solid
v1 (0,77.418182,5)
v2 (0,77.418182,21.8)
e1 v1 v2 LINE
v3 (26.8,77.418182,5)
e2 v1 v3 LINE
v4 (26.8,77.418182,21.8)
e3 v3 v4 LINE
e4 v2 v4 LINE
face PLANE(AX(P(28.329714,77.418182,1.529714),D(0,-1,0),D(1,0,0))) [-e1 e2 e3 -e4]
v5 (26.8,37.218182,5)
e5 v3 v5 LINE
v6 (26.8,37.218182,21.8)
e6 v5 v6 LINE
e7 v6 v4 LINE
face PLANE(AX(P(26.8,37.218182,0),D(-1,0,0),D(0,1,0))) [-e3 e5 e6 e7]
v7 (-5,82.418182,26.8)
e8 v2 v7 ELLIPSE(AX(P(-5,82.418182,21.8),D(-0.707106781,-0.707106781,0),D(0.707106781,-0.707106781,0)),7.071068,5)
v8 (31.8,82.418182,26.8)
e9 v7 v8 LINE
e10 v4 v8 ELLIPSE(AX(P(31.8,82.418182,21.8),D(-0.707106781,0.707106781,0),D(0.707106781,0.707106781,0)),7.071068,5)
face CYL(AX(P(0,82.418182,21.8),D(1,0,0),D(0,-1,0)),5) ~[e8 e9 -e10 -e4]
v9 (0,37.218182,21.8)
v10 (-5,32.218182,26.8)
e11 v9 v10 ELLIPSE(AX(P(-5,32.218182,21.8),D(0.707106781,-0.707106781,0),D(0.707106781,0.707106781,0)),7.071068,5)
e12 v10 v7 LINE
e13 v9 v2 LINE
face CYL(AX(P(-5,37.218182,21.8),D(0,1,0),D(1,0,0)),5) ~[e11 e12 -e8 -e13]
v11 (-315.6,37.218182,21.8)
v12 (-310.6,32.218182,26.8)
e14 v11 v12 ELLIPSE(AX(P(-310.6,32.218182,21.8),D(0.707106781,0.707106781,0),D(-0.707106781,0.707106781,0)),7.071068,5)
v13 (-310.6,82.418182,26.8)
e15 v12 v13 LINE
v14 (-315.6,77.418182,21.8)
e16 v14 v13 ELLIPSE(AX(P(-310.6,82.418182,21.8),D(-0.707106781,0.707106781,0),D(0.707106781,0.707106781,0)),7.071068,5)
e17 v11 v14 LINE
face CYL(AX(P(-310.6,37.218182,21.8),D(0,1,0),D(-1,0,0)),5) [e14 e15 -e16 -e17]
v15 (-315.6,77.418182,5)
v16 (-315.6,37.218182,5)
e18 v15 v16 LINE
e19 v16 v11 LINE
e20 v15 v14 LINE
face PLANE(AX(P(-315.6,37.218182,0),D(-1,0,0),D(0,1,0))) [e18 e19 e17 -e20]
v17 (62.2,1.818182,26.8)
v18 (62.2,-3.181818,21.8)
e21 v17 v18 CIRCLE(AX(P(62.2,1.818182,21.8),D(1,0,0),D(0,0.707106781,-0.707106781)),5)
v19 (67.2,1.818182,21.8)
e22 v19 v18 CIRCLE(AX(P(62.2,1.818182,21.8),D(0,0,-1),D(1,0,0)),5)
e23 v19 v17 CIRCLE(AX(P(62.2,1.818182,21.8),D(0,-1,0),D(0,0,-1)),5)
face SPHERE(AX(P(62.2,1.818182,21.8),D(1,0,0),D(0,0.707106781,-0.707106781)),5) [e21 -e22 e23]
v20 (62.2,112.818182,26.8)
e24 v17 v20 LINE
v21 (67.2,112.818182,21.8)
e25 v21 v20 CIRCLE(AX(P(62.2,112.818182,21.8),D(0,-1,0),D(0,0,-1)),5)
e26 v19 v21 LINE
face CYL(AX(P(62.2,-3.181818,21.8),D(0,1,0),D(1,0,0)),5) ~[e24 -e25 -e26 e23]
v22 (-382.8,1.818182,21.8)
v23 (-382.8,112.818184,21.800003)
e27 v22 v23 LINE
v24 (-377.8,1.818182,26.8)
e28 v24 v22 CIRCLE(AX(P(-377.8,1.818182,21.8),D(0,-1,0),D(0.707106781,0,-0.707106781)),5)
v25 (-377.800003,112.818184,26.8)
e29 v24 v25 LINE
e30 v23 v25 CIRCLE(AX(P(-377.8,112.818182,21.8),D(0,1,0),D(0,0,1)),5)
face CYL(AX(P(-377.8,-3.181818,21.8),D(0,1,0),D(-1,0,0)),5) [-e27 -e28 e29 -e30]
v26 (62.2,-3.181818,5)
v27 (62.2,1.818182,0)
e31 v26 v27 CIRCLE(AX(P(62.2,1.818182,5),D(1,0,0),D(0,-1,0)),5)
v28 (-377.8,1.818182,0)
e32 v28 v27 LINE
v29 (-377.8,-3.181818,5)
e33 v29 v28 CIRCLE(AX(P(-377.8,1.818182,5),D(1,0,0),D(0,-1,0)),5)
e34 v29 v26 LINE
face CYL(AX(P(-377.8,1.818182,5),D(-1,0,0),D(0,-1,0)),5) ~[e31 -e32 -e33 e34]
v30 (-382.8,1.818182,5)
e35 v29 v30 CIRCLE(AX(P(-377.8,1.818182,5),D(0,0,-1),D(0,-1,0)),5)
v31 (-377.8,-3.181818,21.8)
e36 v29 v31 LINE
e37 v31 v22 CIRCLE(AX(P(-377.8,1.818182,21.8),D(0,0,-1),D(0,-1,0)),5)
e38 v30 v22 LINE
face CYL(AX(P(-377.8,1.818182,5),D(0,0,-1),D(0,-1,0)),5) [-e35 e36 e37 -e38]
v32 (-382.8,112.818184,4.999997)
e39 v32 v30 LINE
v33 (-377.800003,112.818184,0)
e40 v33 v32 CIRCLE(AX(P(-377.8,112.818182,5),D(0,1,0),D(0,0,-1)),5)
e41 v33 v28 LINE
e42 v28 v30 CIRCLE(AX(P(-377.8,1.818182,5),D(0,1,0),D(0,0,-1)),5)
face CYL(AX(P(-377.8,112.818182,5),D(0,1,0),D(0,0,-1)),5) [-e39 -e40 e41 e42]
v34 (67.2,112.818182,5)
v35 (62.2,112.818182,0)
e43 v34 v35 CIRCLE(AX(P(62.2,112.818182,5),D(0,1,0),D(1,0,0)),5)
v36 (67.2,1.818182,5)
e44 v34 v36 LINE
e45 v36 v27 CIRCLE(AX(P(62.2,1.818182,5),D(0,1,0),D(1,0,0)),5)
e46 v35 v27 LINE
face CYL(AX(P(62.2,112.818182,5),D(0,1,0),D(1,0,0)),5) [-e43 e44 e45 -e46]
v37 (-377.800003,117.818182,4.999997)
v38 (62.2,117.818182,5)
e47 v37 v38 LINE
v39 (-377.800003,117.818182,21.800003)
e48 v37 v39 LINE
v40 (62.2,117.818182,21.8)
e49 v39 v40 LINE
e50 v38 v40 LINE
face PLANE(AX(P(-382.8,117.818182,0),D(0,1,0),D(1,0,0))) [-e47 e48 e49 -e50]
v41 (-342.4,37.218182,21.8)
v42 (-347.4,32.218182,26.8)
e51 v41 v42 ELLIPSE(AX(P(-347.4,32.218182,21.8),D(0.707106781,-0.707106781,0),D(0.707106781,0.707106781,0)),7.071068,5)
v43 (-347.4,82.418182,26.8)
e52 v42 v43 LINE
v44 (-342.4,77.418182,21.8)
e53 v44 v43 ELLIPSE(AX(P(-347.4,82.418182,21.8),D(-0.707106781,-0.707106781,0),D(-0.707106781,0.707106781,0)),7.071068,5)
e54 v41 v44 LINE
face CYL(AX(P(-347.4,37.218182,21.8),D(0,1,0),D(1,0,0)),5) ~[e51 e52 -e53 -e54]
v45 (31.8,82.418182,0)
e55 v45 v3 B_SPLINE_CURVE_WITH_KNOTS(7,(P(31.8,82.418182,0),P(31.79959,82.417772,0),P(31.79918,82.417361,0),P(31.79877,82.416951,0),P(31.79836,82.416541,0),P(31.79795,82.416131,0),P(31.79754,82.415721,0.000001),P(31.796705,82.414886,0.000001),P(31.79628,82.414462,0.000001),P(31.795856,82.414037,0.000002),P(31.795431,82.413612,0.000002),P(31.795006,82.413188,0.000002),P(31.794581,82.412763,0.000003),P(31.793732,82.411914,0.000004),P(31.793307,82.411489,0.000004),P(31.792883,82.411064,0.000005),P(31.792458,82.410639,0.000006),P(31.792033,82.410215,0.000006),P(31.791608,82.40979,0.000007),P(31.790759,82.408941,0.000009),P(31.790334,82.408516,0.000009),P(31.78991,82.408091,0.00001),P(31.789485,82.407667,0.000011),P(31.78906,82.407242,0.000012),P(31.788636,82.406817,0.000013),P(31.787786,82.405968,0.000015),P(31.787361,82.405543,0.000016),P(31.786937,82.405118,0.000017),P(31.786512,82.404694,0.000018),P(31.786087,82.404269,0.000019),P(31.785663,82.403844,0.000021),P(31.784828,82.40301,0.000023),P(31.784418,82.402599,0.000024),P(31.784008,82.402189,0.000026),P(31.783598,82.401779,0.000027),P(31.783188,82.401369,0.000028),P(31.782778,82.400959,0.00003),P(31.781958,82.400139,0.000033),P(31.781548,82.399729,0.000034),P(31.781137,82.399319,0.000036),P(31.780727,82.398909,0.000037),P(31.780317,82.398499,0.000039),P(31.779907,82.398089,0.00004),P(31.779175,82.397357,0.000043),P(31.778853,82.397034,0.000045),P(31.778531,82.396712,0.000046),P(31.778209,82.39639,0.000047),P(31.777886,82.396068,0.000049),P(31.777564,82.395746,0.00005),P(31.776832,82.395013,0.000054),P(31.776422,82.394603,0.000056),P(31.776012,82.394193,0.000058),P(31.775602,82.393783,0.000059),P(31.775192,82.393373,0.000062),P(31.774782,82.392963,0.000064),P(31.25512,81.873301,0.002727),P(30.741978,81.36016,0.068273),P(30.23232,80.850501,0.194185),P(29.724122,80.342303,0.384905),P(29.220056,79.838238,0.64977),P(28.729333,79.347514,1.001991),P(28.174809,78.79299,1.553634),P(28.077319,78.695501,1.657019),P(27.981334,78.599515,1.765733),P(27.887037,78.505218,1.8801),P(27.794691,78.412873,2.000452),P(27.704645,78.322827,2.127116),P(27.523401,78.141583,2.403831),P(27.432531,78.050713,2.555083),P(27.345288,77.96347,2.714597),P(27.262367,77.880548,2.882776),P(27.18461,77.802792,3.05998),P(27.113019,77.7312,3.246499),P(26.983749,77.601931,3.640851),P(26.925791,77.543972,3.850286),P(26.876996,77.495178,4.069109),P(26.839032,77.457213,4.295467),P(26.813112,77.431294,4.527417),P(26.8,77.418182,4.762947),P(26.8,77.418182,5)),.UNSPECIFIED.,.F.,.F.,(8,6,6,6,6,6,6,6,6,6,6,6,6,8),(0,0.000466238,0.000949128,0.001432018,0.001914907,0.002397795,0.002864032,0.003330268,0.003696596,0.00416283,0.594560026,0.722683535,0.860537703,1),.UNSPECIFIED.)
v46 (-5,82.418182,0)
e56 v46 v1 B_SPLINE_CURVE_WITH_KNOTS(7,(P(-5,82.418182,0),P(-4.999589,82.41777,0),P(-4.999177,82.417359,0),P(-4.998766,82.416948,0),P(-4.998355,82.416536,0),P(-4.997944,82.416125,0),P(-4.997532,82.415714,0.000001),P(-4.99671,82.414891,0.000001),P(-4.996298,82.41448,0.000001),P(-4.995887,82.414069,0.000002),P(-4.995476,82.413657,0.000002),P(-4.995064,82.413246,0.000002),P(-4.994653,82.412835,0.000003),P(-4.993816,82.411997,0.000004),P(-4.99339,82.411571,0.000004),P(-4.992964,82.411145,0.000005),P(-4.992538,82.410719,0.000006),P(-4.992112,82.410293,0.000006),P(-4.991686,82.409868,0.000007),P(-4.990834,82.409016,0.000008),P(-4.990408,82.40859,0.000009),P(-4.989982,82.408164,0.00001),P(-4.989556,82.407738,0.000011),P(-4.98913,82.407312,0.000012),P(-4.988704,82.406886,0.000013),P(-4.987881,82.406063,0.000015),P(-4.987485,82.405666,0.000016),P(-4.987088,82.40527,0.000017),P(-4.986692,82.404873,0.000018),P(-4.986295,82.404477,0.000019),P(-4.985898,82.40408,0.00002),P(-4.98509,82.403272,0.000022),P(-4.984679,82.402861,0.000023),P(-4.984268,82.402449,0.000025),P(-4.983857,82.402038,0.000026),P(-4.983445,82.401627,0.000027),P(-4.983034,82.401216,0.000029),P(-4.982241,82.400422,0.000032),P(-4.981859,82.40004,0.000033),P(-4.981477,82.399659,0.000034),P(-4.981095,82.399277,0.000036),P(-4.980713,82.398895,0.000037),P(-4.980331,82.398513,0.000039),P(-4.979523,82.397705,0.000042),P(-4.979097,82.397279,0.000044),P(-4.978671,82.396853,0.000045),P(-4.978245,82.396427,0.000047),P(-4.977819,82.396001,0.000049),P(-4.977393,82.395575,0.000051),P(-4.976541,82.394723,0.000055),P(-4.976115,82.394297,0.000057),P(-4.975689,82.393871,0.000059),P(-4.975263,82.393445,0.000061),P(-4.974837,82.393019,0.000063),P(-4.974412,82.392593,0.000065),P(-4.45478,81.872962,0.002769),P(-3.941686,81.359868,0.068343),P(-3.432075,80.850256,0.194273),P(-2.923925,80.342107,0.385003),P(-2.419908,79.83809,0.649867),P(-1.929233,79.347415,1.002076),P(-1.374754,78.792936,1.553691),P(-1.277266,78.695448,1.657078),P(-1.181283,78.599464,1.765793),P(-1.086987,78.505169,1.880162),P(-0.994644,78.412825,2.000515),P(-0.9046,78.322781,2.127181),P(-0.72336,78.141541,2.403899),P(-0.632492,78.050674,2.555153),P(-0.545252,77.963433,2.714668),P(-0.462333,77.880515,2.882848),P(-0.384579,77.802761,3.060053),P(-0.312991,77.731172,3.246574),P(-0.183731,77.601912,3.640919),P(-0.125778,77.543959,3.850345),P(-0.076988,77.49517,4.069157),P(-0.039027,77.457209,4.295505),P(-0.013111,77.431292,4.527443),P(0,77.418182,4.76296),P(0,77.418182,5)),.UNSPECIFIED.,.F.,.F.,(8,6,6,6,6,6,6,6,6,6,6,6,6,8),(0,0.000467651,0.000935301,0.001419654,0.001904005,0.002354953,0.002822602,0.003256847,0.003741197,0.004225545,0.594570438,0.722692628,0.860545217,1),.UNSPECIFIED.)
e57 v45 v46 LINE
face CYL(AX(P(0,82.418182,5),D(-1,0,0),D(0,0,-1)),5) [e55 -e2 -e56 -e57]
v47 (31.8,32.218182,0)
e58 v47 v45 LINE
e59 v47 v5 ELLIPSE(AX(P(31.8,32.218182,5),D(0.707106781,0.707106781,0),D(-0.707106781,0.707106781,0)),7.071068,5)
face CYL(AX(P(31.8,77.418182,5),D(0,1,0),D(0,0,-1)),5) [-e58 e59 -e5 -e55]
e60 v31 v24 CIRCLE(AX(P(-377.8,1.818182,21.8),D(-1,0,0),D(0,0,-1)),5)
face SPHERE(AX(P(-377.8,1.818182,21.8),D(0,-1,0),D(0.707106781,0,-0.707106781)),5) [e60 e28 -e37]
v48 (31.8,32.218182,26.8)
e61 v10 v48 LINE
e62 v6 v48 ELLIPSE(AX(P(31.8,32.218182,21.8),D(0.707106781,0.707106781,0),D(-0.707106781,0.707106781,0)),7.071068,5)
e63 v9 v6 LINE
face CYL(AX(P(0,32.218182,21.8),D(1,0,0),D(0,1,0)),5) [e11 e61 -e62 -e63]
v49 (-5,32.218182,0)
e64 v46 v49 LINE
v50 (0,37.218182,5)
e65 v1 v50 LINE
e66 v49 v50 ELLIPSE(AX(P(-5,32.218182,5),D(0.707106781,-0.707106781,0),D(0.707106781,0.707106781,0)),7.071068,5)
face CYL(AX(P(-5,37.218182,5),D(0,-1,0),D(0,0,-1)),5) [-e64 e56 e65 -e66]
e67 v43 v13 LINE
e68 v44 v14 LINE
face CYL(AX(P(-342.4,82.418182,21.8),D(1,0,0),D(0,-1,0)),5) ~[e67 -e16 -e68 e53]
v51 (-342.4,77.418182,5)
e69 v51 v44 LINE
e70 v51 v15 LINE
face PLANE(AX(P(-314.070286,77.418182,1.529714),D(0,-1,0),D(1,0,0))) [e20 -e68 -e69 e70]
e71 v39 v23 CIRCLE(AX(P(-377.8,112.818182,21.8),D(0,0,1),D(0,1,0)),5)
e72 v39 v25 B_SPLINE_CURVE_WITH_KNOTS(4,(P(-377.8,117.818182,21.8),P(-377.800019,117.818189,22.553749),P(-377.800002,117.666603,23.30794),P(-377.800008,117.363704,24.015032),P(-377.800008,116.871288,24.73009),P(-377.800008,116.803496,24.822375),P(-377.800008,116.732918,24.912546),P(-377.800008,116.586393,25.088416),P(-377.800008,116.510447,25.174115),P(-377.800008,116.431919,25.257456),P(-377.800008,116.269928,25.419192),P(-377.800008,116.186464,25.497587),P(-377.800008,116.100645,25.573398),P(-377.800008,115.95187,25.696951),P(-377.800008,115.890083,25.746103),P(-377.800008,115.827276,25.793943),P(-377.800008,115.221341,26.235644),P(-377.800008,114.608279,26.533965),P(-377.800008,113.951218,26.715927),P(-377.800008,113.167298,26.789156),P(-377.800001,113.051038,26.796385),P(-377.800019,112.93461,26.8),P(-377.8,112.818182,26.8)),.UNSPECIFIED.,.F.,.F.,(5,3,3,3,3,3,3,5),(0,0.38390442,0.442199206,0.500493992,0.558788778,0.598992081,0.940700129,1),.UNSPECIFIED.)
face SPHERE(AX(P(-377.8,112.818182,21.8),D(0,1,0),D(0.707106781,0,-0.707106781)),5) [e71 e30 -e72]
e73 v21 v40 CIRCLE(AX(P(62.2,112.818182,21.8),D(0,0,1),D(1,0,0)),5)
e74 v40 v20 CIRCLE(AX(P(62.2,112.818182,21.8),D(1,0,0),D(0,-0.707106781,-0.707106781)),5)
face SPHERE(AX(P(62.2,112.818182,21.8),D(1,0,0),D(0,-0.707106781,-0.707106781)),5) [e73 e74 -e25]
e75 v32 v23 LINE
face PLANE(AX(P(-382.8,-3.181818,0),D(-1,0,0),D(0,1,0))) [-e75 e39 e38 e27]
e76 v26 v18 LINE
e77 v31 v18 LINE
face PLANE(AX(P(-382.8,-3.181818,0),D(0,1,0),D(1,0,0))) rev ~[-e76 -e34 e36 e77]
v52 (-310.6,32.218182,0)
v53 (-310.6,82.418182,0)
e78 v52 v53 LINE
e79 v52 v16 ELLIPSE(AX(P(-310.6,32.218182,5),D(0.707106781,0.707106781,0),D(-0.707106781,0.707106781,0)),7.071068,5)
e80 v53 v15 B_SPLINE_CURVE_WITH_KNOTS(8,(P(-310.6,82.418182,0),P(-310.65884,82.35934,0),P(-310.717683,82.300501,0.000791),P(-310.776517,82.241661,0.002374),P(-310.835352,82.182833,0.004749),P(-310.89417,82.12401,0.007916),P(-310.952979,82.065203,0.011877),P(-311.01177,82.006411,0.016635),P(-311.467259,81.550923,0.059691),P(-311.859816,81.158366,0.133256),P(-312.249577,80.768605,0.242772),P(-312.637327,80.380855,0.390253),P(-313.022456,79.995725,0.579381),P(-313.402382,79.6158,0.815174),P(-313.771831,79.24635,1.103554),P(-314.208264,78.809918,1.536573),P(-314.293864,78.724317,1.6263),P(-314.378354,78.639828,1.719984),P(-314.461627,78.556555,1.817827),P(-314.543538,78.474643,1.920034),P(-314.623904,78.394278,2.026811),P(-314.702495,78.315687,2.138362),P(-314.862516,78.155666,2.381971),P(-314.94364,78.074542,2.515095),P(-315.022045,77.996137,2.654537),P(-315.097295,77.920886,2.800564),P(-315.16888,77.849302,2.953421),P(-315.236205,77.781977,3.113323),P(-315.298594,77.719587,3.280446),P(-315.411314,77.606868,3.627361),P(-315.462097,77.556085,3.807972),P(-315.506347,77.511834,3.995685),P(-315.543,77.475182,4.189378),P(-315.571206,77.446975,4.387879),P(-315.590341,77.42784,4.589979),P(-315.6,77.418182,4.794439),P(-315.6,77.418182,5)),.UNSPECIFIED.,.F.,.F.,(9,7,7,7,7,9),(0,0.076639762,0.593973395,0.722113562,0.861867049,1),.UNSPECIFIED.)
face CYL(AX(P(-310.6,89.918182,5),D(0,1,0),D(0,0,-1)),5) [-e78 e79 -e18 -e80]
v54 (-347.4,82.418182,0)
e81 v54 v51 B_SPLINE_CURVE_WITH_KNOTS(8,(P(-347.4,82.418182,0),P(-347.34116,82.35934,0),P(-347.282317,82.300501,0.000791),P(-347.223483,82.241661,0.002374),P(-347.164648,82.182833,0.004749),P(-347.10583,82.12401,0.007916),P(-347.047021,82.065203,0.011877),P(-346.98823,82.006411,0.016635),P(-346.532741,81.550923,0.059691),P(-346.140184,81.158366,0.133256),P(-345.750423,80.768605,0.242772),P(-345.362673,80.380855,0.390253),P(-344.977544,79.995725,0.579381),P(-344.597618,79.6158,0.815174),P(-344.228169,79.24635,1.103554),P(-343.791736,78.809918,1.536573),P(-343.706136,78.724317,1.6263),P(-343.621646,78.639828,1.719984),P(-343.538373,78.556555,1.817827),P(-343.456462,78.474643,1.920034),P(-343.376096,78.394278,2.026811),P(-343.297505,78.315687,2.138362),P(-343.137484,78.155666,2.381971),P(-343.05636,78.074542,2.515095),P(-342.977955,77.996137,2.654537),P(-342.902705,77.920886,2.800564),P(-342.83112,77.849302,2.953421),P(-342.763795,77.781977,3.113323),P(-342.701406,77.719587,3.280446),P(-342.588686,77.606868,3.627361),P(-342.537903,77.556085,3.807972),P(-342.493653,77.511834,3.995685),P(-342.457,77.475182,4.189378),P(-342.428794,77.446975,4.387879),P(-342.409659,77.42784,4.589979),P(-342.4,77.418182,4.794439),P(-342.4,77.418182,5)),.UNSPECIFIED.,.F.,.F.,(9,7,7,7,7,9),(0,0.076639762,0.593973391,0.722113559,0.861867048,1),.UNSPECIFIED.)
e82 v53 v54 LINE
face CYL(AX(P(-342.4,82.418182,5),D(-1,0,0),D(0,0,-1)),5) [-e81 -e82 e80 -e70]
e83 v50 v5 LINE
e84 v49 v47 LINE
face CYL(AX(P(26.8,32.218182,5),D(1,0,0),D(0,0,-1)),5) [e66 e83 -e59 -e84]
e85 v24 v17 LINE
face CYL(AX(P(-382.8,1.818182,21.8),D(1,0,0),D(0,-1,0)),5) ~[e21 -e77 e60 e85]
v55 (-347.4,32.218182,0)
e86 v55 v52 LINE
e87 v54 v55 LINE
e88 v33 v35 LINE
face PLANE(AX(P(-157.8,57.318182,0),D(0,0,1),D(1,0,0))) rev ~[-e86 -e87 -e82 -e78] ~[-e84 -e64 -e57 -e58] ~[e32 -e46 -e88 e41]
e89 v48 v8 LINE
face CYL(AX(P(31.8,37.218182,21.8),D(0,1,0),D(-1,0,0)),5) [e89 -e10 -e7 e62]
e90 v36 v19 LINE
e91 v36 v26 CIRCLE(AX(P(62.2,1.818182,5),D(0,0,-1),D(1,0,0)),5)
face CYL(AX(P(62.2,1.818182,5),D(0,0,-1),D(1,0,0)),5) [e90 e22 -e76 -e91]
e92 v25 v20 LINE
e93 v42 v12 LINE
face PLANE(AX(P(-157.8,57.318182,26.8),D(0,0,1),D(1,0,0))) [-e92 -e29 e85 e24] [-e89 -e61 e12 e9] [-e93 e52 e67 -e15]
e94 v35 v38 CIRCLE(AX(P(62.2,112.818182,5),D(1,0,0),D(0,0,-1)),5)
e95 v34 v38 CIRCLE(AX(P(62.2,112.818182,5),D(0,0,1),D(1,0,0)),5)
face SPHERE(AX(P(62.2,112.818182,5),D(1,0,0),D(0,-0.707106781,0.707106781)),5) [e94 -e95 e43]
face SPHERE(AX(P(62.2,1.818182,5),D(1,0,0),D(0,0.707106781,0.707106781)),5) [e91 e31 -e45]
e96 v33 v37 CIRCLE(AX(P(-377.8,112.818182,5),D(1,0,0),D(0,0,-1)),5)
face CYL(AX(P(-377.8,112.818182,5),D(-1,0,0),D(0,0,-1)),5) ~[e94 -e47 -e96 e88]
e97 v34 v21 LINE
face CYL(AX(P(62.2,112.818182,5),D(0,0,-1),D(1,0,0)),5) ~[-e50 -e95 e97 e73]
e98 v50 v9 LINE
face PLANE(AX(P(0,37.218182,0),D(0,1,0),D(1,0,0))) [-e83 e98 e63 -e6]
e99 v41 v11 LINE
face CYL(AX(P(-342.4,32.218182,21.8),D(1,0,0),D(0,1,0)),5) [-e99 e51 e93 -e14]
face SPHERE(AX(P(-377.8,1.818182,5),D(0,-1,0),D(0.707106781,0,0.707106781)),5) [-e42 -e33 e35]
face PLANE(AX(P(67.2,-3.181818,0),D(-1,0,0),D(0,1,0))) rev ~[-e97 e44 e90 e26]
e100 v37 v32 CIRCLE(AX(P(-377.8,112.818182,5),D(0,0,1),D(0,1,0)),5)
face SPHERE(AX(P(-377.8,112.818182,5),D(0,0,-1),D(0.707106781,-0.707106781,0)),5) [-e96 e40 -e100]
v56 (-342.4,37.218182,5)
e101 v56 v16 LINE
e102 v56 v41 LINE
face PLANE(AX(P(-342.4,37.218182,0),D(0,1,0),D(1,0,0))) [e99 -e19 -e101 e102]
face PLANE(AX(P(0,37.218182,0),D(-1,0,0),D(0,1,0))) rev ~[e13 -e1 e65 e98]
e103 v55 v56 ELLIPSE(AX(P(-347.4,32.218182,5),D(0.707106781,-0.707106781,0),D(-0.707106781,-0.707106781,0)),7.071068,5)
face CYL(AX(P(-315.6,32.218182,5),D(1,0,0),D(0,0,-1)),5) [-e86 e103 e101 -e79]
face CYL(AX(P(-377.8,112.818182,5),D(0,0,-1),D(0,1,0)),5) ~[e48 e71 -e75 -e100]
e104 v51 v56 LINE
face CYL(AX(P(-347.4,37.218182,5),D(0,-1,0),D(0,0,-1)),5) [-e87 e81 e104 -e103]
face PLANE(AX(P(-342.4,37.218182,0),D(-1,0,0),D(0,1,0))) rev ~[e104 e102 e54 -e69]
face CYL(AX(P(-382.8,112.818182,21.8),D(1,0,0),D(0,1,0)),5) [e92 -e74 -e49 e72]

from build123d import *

# Parameters (mm, degrees)
F0_W          = 450
F0_H          = 121
F0_W_2        = 26.8
F0_H_2        = 40.2
F1_DEPTH      = 26.8
F2_R          = 5
F3_T1_DEPTH   = 440
F3_T3_DEPTH   = 111
F3_T5_DEPTH   = 40.2
F3_T7_DEPTH   = 26.8
F3_T9_DEPTH   = 26.8
F3_T11_DEPTH  = 16.8
F3_S15_W      = 5
F3_S15_H      = 5
F3_T16_DEPTH  = 5
F3_S21_W      = 5
F3_S21_H      = 5
F3_T22_DEPTH  = 5
F3_S27_W      = 5
F3_S27_H      = 5
F3_T28_DEPTH  = 5
F3_S33_W      = 5
F3_S33_H      = 5
F3_T34_DEPTH  = 5
F3_S39_W      = 5
F3_S39_H      = 5
F3_T40_DEPTH  = 5
F3_S45_W      = 5
F3_S45_H      = 5
F3_T46_DEPTH  = 5
F3_S51_W      = 5
F3_S51_H      = 5
F3_T52_DEPTH  = 5
F3_S57_W      = 5
F3_S57_H      = 5
F3_T58_DEPTH  = 5
F3_T65_DEPTH  = 39.3
F3_T69_DEPTH  = 52.7
F3_T76_DEPTH  = 39.3
F3_T80_DEPTH  = 52.7
F3_T87_DEPTH  = 39.3
F3_T91_DEPTH  = 52.7
F3_T98_DEPTH  = 52.7
F3_T102_DEPTH = 39.3
F3_T109_DEPTH = 52.7
F3_T113_DEPTH = 39.3
F3_T120_DEPTH = 52.7
F3_T124_DEPTH = 39.3
F3_T131_DEPTH = 52.7
F3_T135_DEPTH = 39.3
F3_T142_DEPTH = 39.3
F3_T146_DEPTH = 52.7


# Not quite as in the source:
# - a fillet or chamfer that OpenCascade refuses, or shapes differently, is made with other operations: its cross-section is extruded or revolved along the edge and cut away or added


with BuildPart() as f1:
    # F0 (on Top) → F1 (new body)
    with BuildSketch(Plane.XY):
        with Locations((-157.8, 57.318181593)):
            Rectangle(F0_W, F0_H)
        with Locations((-329, 57.318181593)):
            Rectangle(F0_W_2, F0_H_2, mode=Mode.SUBTRACT)
        with Locations((13.4, 57.318181593)):
            Rectangle(F0_W_2, F0_H_2, mode=Mode.SUBTRACT)
    extrude(amount=F1_DEPTH)

    # F2
    f2_edges = [f1.edges().sort_by_distance(p)[0] for p in [
        (67.2, 57.318182, 26.8),
        (-157.8, 117.818182, 26.8),
        (-382.8, 57.318182, 26.8),
        (-157.8, -3.181818, 26.8),
        (-342.4, 57.318182, 26.8),
        (-329, 77.418182, 26.8),
        (-315.6, 57.318182, 26.8),
        (-329, 37.218182, 26.8),
        (13.4, 77.418182, 26.8),
        (26.8, 57.318182, 26.8),
        (13.4, 37.218182, 26.8),
        (0, 57.318182, 26.8),
    ]]
    fillet(f2_edges, radius=F2_R)

    # F3: fillet of radius 5 on 16 edges, made by hand

    # F3_s2 → F3_t1 (cut)
    with BuildSketch(Plane.YZ.offset(-377.8)):
        with BuildLine():
            ThreePointArc((-3.181818407, 5), (-1.717352313, 1.4644660941), (1.818181593, 0))
            Line((1.818181593, 0), (-3.181818407, 0))
            Line((-3.181818407, 0), (-3.181818407, 5))
        make_face()
        with BuildLine():
            ThreePointArc((112.818181593, 0), (116.3537154989, 1.4644660941), (117.818181593, 5))
            Line((117.818181593, 5), (117.818181593, 0))
            Line((117.818181593, 0), (112.818181593, 0))
        make_face()
    extrude(amount=F3_T1_DEPTH, mode=Mode.SUBTRACT)

    # F3_s4 → F3_t3 (cut)
    with BuildSketch(Plane.XZ.offset(-112.818181593)):
        with BuildLine():
            ThreePointArc((-377.8, 0), (-381.3355339059, 1.4644660941), (-382.8, 5))
            Line((-382.8, 5), (-382.8, 0))
            Line((-382.8, 0), (-377.8, 0))
        make_face()
        with BuildLine():
            ThreePointArc((67.2, 5), (65.7355339059, 1.4644660941), (62.2, 0))
            Line((62.2, 0), (67.2, 0))
            Line((67.2, 0), (67.2, 5))
        make_face()
    extrude(amount=F3_T3_DEPTH, mode=Mode.SUBTRACT)

    # F3_s6 → F3_t5 (cut)
    with BuildSketch(Plane.XZ.offset(-77.418181593)):
        with BuildLine():
            ThreePointArc((-5, 0), (-1.4644660941, 1.4644660941), (0, 5))
            Line((0, 5), (0, 0))
            Line((0, 0), (-5, 0))
        make_face()
        with BuildLine():
            ThreePointArc((31.8, 0), (28.2644660941, 1.4644660941), (26.8, 5))
            Line((26.8, 5), (26.8, 0))
            Line((26.8, 0), (31.8, 0))
        make_face()
        with BuildLine():
            ThreePointArc((-347.4, 0), (-343.8644660941, 1.4644660941), (-342.4, 5))
            Line((-342.4, 5), (-342.4, 0))
            Line((-342.4, 0), (-347.4, 0))
        make_face()
        with BuildLine():
            ThreePointArc((-310.6, 0), (-314.1355339059, 1.4644660941), (-315.6, 5))
            Line((-315.6, 5), (-315.6, 0))
            Line((-315.6, 0), (-310.6, 0))
        make_face()
    extrude(amount=F3_T5_DEPTH, mode=Mode.SUBTRACT)

    # F3_s8 → F3_t7 (cut)
    with BuildSketch(Plane.YZ):
        with BuildLine():
            ThreePointArc((82.418181593, 0), (78.882647687, 1.4644660941), (77.418181593, 5))
            Line((77.418181593, 5), (77.418181593, 0))
            Line((77.418181593, 0), (82.418181593, 0))
        make_face()
        with BuildLine():
            ThreePointArc((32.218181593, 0), (35.7537154989, 1.4644660941), (37.218181593, 5))
            Line((37.218181593, 5), (37.218181593, 0))
            Line((37.218181593, 0), (32.218181593, 0))
        make_face()
    extrude(amount=F3_T7_DEPTH, mode=Mode.SUBTRACT)

    # F3_s10 → F3_t9 (cut)
    with BuildSketch(Plane.YZ.offset(-342.4)):
        with BuildLine():
            ThreePointArc((32.218181593, 0), (35.7537154989, 1.4644660941), (37.218181593, 5))
            Line((37.218181593, 5), (37.218181593, 0))
            Line((37.218181593, 0), (32.218181593, 0))
        make_face()
        with BuildLine():
            ThreePointArc((82.418181593, 0), (78.882647687, 1.4644660941), (77.418181593, 5))
            Line((77.418181593, 5), (77.418181593, 0))
            Line((77.418181593, 0), (82.418181593, 0))
        make_face()
    extrude(amount=F3_T9_DEPTH, mode=Mode.SUBTRACT)

    # F3_s12 → F3_t11 (cut)
    with BuildSketch(Plane.XY.offset(5)):
        with BuildLine():
            ThreePointArc((-377.8, -3.181818407), (-381.3355339059, -1.717352313), (-382.8, 1.818181593))
            Line((-382.8, 1.818181593), (-382.8, -3.181818407))
            Line((-382.8, -3.181818407), (-377.8, -3.181818407))
        make_face()
        with BuildLine():
            ThreePointArc((67.2, 1.818181593), (65.7355339059, -1.717352313), (62.2, -3.181818407))
            Line((62.2, -3.181818407), (67.2, -3.181818407))
            Line((67.2, -3.181818407), (67.2, 1.818181593))
        make_face()
        with BuildLine():
            ThreePointArc((-377.8, 117.818181593), (-381.3355339059, 116.3537154989), (-382.8, 112.818181593))
            Line((-382.8, 112.818181593), (-382.8, 117.818181593))
            Line((-382.8, 117.818181593), (-377.8, 117.818181593))
        make_face()
        with BuildLine():
            ThreePointArc((67.2, 112.818181593), (65.7355339059, 116.3537154989), (62.2, 117.818181593))
            Line((62.2, 117.818181593), (67.2, 117.818181593))
            Line((67.2, 117.818181593), (67.2, 112.818181593))
        make_face()
    extrude(amount=F3_T11_DEPTH, mode=Mode.SUBTRACT)


with BuildPart() as f3_tool14:
    # F3_s15 → F3_t16 (new body)
    with BuildSketch(Plane.YZ.offset(62.2)):
        with Locations((115.318181593, 24.3)):
            Rectangle(F3_S15_W, F3_S15_H)
    extrude(amount=F3_T16_DEPTH)

    # F3_s17 → F3_t18 (revolve, cut)
    with BuildSketch(Plane(origin=(62.2, 112.818181593, 21.8), x_dir=(0, -0.7071067812, -0.7071067812), z_dir=(0, -0.7071067812, 0.7071067812))):
        with BuildLine():
            ThreePointArc((0, -5), (5, 0), (0, 5))
            Line((0, 5), (0, -5))
        make_face()
    revolve(axis=Axis((62.2, 112.818181593, 21.8), (1, 0, 0)), mode=Mode.SUBTRACT)


with BuildPart() as f1_1:
    add(f1.part)

    # F3_t13: cut F3_tool14
    add(f3_tool14.part, mode=Mode.SUBTRACT)


with BuildPart() as f3_tool20:
    # F3_s21 → F3_t22 (new body)
    with BuildSketch(Plane.XZ.offset(-112.818181593)):
        with Locations((-380.3, 24.3)):
            Rectangle(F3_S21_W, F3_S21_H)
    extrude(amount=-F3_T22_DEPTH)

    # F3_s23 → F3_t24 (revolve, cut)
    with BuildSketch(Plane(origin=(-377.8, 112.818181593, 21.8), x_dir=(0.7071067812, 0, -0.7071067812), z_dir=(0.7071067812, 0, 0.7071067812))):
        with BuildLine():
            ThreePointArc((0, -5), (5, 0), (0, 5))
            Line((0, 5), (0, -5))
        make_face()
    revolve(axis=Axis((-377.8, 112.818181593, 21.8), (0, 1, 0)), mode=Mode.SUBTRACT)


with BuildPart() as f1_2:
    add(f1_1.part)

    # F3_t19: cut F3_tool20
    add(f3_tool20.part, mode=Mode.SUBTRACT)


with BuildPart() as f3_tool26:
    # F3_s27 → F3_t28 (new body)
    with BuildSketch(Plane.YZ.offset(62.2)):
        with Locations((-0.681818407, 24.3)):
            Rectangle(F3_S27_W, F3_S27_H)
    extrude(amount=F3_T28_DEPTH)

    # F3_s29 → F3_t30 (revolve, cut)
    with BuildSketch(Plane(origin=(62.2, 1.818181593, 21.8), x_dir=(0, 0.7071067812, -0.7071067812), z_dir=(0, -0.7071067812, -0.7071067812))):
        with BuildLine():
            ThreePointArc((0, -5), (5, 0), (0, 5))
            Line((0, 5), (0, -5))
        make_face()
    revolve(axis=Axis((62.2, 1.818181593, 21.8), (1, 0, 0)), mode=Mode.SUBTRACT)


with BuildPart() as f1_3:
    add(f1_2.part)

    # F3_t25: cut F3_tool26
    add(f3_tool26.part, mode=Mode.SUBTRACT)


with BuildPart() as f3_tool32:
    # F3_s33 → F3_t34 (new body)
    with BuildSketch(Plane.XZ.offset(-1.818181593)):
        with Locations((-380.3, 24.3)):
            Rectangle(F3_S33_W, F3_S33_H)
    extrude(amount=F3_T34_DEPTH)

    # F3_s35 → F3_t36 (revolve, cut)
    with BuildSketch(Plane(origin=(-377.8, 1.818181593, 21.8), x_dir=(0.7071067812, 0, -0.7071067812), z_dir=(-0.7071067812, 0, -0.7071067812))):
        with BuildLine():
            ThreePointArc((0, -5), (5, 0), (0, 5))
            Line((0, 5), (0, -5))
        make_face()
    revolve(axis=Axis((-377.8, 1.818181593, 21.8), (0, -1, 0)), mode=Mode.SUBTRACT)


with BuildPart() as f1_4:
    add(f1_3.part)

    # F3_t31: cut F3_tool32
    add(f3_tool32.part, mode=Mode.SUBTRACT)


with BuildPart() as f3_tool38:
    # F3_s39 → F3_t40 (new body)
    with BuildSketch(Plane.XZ.offset(-1.818181593)):
        with Locations((-380.3, 2.5)):
            Rectangle(F3_S39_W, F3_S39_H)
    extrude(amount=F3_T40_DEPTH)

    # F3_s41 → F3_t42 (revolve, cut)
    with BuildSketch(Plane(origin=(-377.8, 1.818181593, 5), x_dir=(0.7071067812, 0, 0.7071067812), z_dir=(0.7071067812, 0, -0.7071067812))):
        with BuildLine():
            ThreePointArc((0, -5), (5, 0), (0, 5))
            Line((0, 5), (0, -5))
        make_face()
    revolve(axis=Axis((-377.8, 1.818181593, 5), (0, -1, 0)), mode=Mode.SUBTRACT)


with BuildPart() as f1_5:
    add(f1_4.part)

    # F3_t37: cut F3_tool38
    add(f3_tool38.part, mode=Mode.SUBTRACT)


with BuildPart() as f3_tool44:
    # F3_s45 → F3_t46 (new body)
    with BuildSketch(Plane.YZ.offset(62.2)):
        with Locations((-0.681818407, 2.5)):
            Rectangle(F3_S45_W, F3_S45_H)
    extrude(amount=F3_T46_DEPTH)

    # F3_s47 → F3_t48 (revolve, cut)
    with BuildSketch(Plane(origin=(62.2, 1.818181593, 5), x_dir=(0, 0.7071067812, 0.7071067812), z_dir=(0, 0.7071067812, -0.7071067812))):
        with BuildLine():
            ThreePointArc((0, -5), (5, 0), (0, 5))
            Line((0, 5), (0, -5))
        make_face()
    revolve(axis=Axis((62.2, 1.818181593, 5), (1, 0, 0)), mode=Mode.SUBTRACT)


with BuildPart() as f1_6:
    add(f1_5.part)

    # F3_t43: cut F3_tool44
    add(f3_tool44.part, mode=Mode.SUBTRACT)


with BuildPart() as f3_tool50:
    # F3_s51 → F3_t52 (new body)
    with BuildSketch(Plane.XY.offset(5)):
        with Locations((-380.3, 115.318181593)):
            Rectangle(F3_S51_W, F3_S51_H)
    extrude(amount=-F3_T52_DEPTH)

    # F3_s53 → F3_t54 (revolve, cut)
    with BuildSketch(Plane(origin=(-377.8, 112.818181593, 5), x_dir=(0.7071067812, -0.7071067812, 0), z_dir=(0.7071067812, 0.7071067812, 0))):
        with BuildLine():
            ThreePointArc((0, -5), (5, 0), (0, 5))
            Line((0, 5), (0, -5))
        make_face()
    revolve(axis=Axis((-377.8, 112.818181593, 5), (0, 0, -1)), mode=Mode.SUBTRACT)


with BuildPart() as f1_7:
    add(f1_6.part)

    # F3_t49: cut F3_tool50
    add(f3_tool50.part, mode=Mode.SUBTRACT)


with BuildPart() as f3_tool56:
    # F3_s57 → F3_t58 (new body)
    with BuildSketch(Plane.YZ.offset(62.2)):
        with Locations((115.318181593, 2.5)):
            Rectangle(F3_S57_W, F3_S57_H)
    extrude(amount=F3_T58_DEPTH)

    # F3_s59 → F3_t60 (revolve, cut)
    with BuildSketch(Plane(origin=(62.2, 112.818181593, 5), x_dir=(0, -0.7071067812, 0.7071067812), z_dir=(0, 0.7071067812, 0.7071067812))):
        with BuildLine():
            ThreePointArc((0, -5), (5, 0), (0, 5))
            Line((0, 5), (0, -5))
        make_face()
    revolve(axis=Axis((62.2, 112.818181593, 5), (1, 0, 0)), mode=Mode.SUBTRACT)


with BuildPart() as f1_8:
    add(f1_7.part)

    # F3_t55: cut F3_tool56
    add(f3_tool56.part, mode=Mode.SUBTRACT)


with BuildPart() as f3_tool63:
    # F3_s64 → F3_t65 (new body)
    with BuildSketch(Plane.YZ.offset(26.8)):
        with BuildLine():
            ThreePointArc((32.218181593, 0), (35.7537154989, 1.4644660941), (37.218181593, 5))
            Line((37.218181593, 5), (37.218181593, 0))
            Line((37.218181593, 0), (32.218181593, 0))
        make_face()
    extrude(amount=-F3_T65_DEPTH)

    split(bisect_by=Plane.YZ, keep=Keep.BOTTOM)


with BuildPart() as f3_tool67:
    # F3_s68 → F3_t69 (new body)
    with BuildSketch(Plane.XZ.offset(-24.718181593)):
        with BuildLine():
            ThreePointArc((-5, 0), (-1.4644660941, 1.4644660941), (0, 5))
            Line((0, 5), (0, 0))
            Line((0, 0), (-5, 0))
        make_face()
    extrude(amount=-F3_T69_DEPTH)

    split(bisect_by=Plane.XZ.offset(-37.218181593), keep=Keep.TOP)


with BuildPart() as f3_tool63_1:
    add(f3_tool63.part)

    # F3_t71: intersect F3_tool67
    add(f3_tool67.part, mode=Mode.INTERSECT)


with BuildPart() as f1_9:
    add(f1_8.part)

    # F3_t61: cut F3_tool63
    add(f3_tool63_1.part, mode=Mode.SUBTRACT)


with BuildPart() as f3_tool74:
    # F3_s75 → F3_t76 (new body)
    with BuildSketch(Plane.YZ.offset(-12.5)):
        with BuildLine():
            ThreePointArc((82.418181593, 0), (78.882647687, 1.4644660941), (77.418181593, 5))
            Line((77.418181593, 5), (77.418181593, 0))
            Line((77.418181593, 0), (82.418181593, 0))
        make_face()
    extrude(amount=F3_T76_DEPTH)

    split(bisect_by=Plane.YZ, keep=Keep.BOTTOM)


with BuildPart() as f3_tool78:
    # F3_s79 → F3_t80 (new body)
    with BuildSketch(Plane.XZ.offset(-37.218181593)):
        with BuildLine():
            ThreePointArc((-5, 0), (-1.4644660941, 1.4644660941), (0, 5))
            Line((0, 5), (0, 0))
            Line((0, 0), (-5, 0))
        make_face()
    extrude(amount=-F3_T80_DEPTH)

    split(bisect_by=Plane.XZ.offset(-77.418181593), keep=Keep.BOTTOM)


with BuildPart() as f3_tool74_1:
    add(f3_tool74.part)

    # F3_t82: intersect F3_tool78
    add(f3_tool78.part, mode=Mode.INTERSECT)


with BuildPart() as f1_10:
    add(f1_9.part)

    # F3_t72: cut F3_tool74
    add(f3_tool74_1.part, mode=Mode.SUBTRACT)


with BuildPart() as f3_tool85:
    # F3_s86 → F3_t87 (new body)
    with BuildSketch(Plane.YZ):
        with BuildLine():
            ThreePointArc((82.418181593, 0), (78.882647687, 1.4644660941), (77.418181593, 5))
            Line((77.418181593, 5), (77.418181593, 0))
            Line((77.418181593, 0), (82.418181593, 0))
        make_face()
    extrude(amount=F3_T87_DEPTH)

    split(bisect_by=Plane.YZ.offset(26.8), keep=Keep.TOP)


with BuildPart() as f3_tool89:
    # F3_s90 → F3_t91 (new body)
    with BuildSketch(Plane.XZ.offset(-89.918181593)):
        with BuildLine():
            ThreePointArc((31.8, 0), (28.2644660941, 1.4644660941), (26.8, 5))
            Line((26.8, 5), (26.8, 0))
            Line((26.8, 0), (31.8, 0))
        make_face()
    extrude(amount=F3_T91_DEPTH)

    split(bisect_by=Plane.XZ.offset(-77.418181593), keep=Keep.BOTTOM)


with BuildPart() as f3_tool85_1:
    add(f3_tool85.part)

    # F3_t93: intersect F3_tool89
    add(f3_tool89.part, mode=Mode.INTERSECT)


with BuildPart() as f1_11:
    add(f1_10.part)

    # F3_t83: cut F3_tool85
    add(f3_tool85_1.part, mode=Mode.SUBTRACT)


with BuildPart() as f3_tool96:
    # F3_s97 → F3_t98 (new body)
    with BuildSketch(Plane.XZ.offset(-77.418181593)):
        with BuildLine():
            ThreePointArc((31.8, 0), (28.2644660941, 1.4644660941), (26.8, 5))
            Line((26.8, 5), (26.8, 0))
            Line((26.8, 0), (31.8, 0))
        make_face()
    extrude(amount=F3_T98_DEPTH)

    split(bisect_by=Plane.XZ.offset(-37.218181593), keep=Keep.TOP)


with BuildPart() as f3_tool100:
    # F3_s101 → F3_t102 (new body)
    with BuildSketch(Plane.YZ.offset(39.3)):
        with BuildLine():
            ThreePointArc((32.218181593, 0), (35.7537154989, 1.4644660941), (37.218181593, 5))
            Line((37.218181593, 5), (37.218181593, 0))
            Line((37.218181593, 0), (32.218181593, 0))
        make_face()
    extrude(amount=-F3_T102_DEPTH)

    split(bisect_by=Plane.YZ.offset(26.8), keep=Keep.TOP)


with BuildPart() as f3_tool96_1:
    add(f3_tool96.part)

    # F3_t104: intersect F3_tool100
    add(f3_tool100.part, mode=Mode.INTERSECT)


with BuildPart() as f1_12:
    add(f1_11.part)

    # F3_t94: cut F3_tool96
    add(f3_tool96_1.part, mode=Mode.SUBTRACT)


with BuildPart() as f3_tool107:
    # F3_s108 → F3_t109 (new body)
    with BuildSketch(Plane.XZ.offset(-77.418181593)):
        with BuildLine():
            ThreePointArc((-310.6, 0), (-314.1355339059, 1.4644660941), (-315.6, 5))
            Line((-315.6, 5), (-315.6, 0))
            Line((-315.6, 0), (-310.6, 0))
        make_face()
    extrude(amount=F3_T109_DEPTH)

    split(bisect_by=Plane.XZ.offset(-37.218181593), keep=Keep.TOP)


with BuildPart() as f3_tool111:
    # F3_s112 → F3_t113 (new body)
    with BuildSketch(Plane.YZ.offset(-303.1)):
        with BuildLine():
            ThreePointArc((32.218181593, 0), (35.7537154989, 1.4644660941), (37.218181593, 5))
            Line((37.218181593, 5), (37.218181593, 0))
            Line((37.218181593, 0), (32.218181593, 0))
        make_face()
    extrude(amount=-F3_T113_DEPTH)

    split(bisect_by=Plane.YZ.offset(-315.6), keep=Keep.TOP)


with BuildPart() as f3_tool107_1:
    add(f3_tool107.part)

    # F3_t115: intersect F3_tool111
    add(f3_tool111.part, mode=Mode.INTERSECT)


with BuildPart() as f1_13:
    add(f1_12.part)

    # F3_t105: cut F3_tool107
    add(f3_tool107_1.part, mode=Mode.SUBTRACT)


with BuildPart() as f3_tool118:
    # F3_s119 → F3_t120 (new body)
    with BuildSketch(Plane.XZ.offset(-24.718181593)):
        with BuildLine():
            ThreePointArc((-347.4, 0), (-343.8644660941, 1.4644660941), (-342.4, 5))
            Line((-342.4, 5), (-342.4, 0))
            Line((-342.4, 0), (-347.4, 0))
        make_face()
    extrude(amount=-F3_T120_DEPTH)

    split(bisect_by=Plane.XZ.offset(-37.218181593), keep=Keep.TOP)


with BuildPart() as f3_tool122:
    # F3_s123 → F3_t124 (new body)
    with BuildSketch(Plane.YZ.offset(-315.6)):
        with BuildLine():
            ThreePointArc((32.218181593, 0), (35.7537154989, 1.4644660941), (37.218181593, 5))
            Line((37.218181593, 5), (37.218181593, 0))
            Line((37.218181593, 0), (32.218181593, 0))
        make_face()
    extrude(amount=-F3_T124_DEPTH)

    split(bisect_by=Plane.YZ.offset(-342.4), keep=Keep.BOTTOM)


with BuildPart() as f3_tool118_1:
    add(f3_tool118.part)

    # F3_t126: intersect F3_tool122
    add(f3_tool122.part, mode=Mode.INTERSECT)


with BuildPart() as f1_14:
    add(f1_13.part)

    # F3_t116: cut F3_tool118
    add(f3_tool118_1.part, mode=Mode.SUBTRACT)


with BuildPart() as f3_tool129:
    # F3_s130 → F3_t131 (new body)
    with BuildSketch(Plane.XZ.offset(-37.218181593)):
        with BuildLine():
            ThreePointArc((-347.4, 0), (-343.8644660941, 1.4644660941), (-342.4, 5))
            Line((-342.4, 5), (-342.4, 0))
            Line((-342.4, 0), (-347.4, 0))
        make_face()
    extrude(amount=-F3_T131_DEPTH)

    split(bisect_by=Plane.XZ.offset(-77.418181593), keep=Keep.BOTTOM)


with BuildPart() as f3_tool133:
    # F3_s134 → F3_t135 (new body)
    with BuildSketch(Plane.YZ.offset(-354.9)):
        with BuildLine():
            ThreePointArc((82.418181593, 0), (78.882647687, 1.4644660941), (77.418181593, 5))
            Line((77.418181593, 5), (77.418181593, 0))
            Line((77.418181593, 0), (82.418181593, 0))
        make_face()
    extrude(amount=F3_T135_DEPTH)

    split(bisect_by=Plane.YZ.offset(-342.4), keep=Keep.BOTTOM)


with BuildPart() as f3_tool129_1:
    add(f3_tool129.part)

    # F3_t137: intersect F3_tool133
    add(f3_tool133.part, mode=Mode.INTERSECT)


with BuildPart() as f1_15:
    add(f1_14.part)

    # F3_t127: cut F3_tool129
    add(f3_tool129_1.part, mode=Mode.SUBTRACT)


with BuildPart() as f3_tool140:
    # F3_s141 → F3_t142 (new body)
    with BuildSketch(Plane.YZ.offset(-342.4)):
        with BuildLine():
            ThreePointArc((82.418181593, 0), (78.882647687, 1.4644660941), (77.418181593, 5))
            Line((77.418181593, 5), (77.418181593, 0))
            Line((77.418181593, 0), (82.418181593, 0))
        make_face()
    extrude(amount=F3_T142_DEPTH)

    split(bisect_by=Plane.YZ.offset(-315.6), keep=Keep.TOP)


with BuildPart() as f3_tool144:
    # F3_s145 → F3_t146 (new body)
    with BuildSketch(Plane.XZ.offset(-89.918181593)):
        with BuildLine():
            ThreePointArc((-310.6, 0), (-314.1355339059, 1.4644660941), (-315.6, 5))
            Line((-315.6, 5), (-315.6, 0))
            Line((-315.6, 0), (-310.6, 0))
        make_face()
    extrude(amount=F3_T146_DEPTH)

    split(bisect_by=Plane.XZ.offset(-77.418181593), keep=Keep.BOTTOM)


with BuildPart() as f3_tool140_1:
    add(f3_tool140.part)

    # F3_t148: intersect F3_tool144
    add(f3_tool144.part, mode=Mode.INTERSECT)


with BuildPart() as f1_16:
    add(f1_15.part)

    # F3_t138: cut F3_tool140
    add(f3_tool140_1.part, mode=Mode.SUBTRACT)


solid = f1_16.part
